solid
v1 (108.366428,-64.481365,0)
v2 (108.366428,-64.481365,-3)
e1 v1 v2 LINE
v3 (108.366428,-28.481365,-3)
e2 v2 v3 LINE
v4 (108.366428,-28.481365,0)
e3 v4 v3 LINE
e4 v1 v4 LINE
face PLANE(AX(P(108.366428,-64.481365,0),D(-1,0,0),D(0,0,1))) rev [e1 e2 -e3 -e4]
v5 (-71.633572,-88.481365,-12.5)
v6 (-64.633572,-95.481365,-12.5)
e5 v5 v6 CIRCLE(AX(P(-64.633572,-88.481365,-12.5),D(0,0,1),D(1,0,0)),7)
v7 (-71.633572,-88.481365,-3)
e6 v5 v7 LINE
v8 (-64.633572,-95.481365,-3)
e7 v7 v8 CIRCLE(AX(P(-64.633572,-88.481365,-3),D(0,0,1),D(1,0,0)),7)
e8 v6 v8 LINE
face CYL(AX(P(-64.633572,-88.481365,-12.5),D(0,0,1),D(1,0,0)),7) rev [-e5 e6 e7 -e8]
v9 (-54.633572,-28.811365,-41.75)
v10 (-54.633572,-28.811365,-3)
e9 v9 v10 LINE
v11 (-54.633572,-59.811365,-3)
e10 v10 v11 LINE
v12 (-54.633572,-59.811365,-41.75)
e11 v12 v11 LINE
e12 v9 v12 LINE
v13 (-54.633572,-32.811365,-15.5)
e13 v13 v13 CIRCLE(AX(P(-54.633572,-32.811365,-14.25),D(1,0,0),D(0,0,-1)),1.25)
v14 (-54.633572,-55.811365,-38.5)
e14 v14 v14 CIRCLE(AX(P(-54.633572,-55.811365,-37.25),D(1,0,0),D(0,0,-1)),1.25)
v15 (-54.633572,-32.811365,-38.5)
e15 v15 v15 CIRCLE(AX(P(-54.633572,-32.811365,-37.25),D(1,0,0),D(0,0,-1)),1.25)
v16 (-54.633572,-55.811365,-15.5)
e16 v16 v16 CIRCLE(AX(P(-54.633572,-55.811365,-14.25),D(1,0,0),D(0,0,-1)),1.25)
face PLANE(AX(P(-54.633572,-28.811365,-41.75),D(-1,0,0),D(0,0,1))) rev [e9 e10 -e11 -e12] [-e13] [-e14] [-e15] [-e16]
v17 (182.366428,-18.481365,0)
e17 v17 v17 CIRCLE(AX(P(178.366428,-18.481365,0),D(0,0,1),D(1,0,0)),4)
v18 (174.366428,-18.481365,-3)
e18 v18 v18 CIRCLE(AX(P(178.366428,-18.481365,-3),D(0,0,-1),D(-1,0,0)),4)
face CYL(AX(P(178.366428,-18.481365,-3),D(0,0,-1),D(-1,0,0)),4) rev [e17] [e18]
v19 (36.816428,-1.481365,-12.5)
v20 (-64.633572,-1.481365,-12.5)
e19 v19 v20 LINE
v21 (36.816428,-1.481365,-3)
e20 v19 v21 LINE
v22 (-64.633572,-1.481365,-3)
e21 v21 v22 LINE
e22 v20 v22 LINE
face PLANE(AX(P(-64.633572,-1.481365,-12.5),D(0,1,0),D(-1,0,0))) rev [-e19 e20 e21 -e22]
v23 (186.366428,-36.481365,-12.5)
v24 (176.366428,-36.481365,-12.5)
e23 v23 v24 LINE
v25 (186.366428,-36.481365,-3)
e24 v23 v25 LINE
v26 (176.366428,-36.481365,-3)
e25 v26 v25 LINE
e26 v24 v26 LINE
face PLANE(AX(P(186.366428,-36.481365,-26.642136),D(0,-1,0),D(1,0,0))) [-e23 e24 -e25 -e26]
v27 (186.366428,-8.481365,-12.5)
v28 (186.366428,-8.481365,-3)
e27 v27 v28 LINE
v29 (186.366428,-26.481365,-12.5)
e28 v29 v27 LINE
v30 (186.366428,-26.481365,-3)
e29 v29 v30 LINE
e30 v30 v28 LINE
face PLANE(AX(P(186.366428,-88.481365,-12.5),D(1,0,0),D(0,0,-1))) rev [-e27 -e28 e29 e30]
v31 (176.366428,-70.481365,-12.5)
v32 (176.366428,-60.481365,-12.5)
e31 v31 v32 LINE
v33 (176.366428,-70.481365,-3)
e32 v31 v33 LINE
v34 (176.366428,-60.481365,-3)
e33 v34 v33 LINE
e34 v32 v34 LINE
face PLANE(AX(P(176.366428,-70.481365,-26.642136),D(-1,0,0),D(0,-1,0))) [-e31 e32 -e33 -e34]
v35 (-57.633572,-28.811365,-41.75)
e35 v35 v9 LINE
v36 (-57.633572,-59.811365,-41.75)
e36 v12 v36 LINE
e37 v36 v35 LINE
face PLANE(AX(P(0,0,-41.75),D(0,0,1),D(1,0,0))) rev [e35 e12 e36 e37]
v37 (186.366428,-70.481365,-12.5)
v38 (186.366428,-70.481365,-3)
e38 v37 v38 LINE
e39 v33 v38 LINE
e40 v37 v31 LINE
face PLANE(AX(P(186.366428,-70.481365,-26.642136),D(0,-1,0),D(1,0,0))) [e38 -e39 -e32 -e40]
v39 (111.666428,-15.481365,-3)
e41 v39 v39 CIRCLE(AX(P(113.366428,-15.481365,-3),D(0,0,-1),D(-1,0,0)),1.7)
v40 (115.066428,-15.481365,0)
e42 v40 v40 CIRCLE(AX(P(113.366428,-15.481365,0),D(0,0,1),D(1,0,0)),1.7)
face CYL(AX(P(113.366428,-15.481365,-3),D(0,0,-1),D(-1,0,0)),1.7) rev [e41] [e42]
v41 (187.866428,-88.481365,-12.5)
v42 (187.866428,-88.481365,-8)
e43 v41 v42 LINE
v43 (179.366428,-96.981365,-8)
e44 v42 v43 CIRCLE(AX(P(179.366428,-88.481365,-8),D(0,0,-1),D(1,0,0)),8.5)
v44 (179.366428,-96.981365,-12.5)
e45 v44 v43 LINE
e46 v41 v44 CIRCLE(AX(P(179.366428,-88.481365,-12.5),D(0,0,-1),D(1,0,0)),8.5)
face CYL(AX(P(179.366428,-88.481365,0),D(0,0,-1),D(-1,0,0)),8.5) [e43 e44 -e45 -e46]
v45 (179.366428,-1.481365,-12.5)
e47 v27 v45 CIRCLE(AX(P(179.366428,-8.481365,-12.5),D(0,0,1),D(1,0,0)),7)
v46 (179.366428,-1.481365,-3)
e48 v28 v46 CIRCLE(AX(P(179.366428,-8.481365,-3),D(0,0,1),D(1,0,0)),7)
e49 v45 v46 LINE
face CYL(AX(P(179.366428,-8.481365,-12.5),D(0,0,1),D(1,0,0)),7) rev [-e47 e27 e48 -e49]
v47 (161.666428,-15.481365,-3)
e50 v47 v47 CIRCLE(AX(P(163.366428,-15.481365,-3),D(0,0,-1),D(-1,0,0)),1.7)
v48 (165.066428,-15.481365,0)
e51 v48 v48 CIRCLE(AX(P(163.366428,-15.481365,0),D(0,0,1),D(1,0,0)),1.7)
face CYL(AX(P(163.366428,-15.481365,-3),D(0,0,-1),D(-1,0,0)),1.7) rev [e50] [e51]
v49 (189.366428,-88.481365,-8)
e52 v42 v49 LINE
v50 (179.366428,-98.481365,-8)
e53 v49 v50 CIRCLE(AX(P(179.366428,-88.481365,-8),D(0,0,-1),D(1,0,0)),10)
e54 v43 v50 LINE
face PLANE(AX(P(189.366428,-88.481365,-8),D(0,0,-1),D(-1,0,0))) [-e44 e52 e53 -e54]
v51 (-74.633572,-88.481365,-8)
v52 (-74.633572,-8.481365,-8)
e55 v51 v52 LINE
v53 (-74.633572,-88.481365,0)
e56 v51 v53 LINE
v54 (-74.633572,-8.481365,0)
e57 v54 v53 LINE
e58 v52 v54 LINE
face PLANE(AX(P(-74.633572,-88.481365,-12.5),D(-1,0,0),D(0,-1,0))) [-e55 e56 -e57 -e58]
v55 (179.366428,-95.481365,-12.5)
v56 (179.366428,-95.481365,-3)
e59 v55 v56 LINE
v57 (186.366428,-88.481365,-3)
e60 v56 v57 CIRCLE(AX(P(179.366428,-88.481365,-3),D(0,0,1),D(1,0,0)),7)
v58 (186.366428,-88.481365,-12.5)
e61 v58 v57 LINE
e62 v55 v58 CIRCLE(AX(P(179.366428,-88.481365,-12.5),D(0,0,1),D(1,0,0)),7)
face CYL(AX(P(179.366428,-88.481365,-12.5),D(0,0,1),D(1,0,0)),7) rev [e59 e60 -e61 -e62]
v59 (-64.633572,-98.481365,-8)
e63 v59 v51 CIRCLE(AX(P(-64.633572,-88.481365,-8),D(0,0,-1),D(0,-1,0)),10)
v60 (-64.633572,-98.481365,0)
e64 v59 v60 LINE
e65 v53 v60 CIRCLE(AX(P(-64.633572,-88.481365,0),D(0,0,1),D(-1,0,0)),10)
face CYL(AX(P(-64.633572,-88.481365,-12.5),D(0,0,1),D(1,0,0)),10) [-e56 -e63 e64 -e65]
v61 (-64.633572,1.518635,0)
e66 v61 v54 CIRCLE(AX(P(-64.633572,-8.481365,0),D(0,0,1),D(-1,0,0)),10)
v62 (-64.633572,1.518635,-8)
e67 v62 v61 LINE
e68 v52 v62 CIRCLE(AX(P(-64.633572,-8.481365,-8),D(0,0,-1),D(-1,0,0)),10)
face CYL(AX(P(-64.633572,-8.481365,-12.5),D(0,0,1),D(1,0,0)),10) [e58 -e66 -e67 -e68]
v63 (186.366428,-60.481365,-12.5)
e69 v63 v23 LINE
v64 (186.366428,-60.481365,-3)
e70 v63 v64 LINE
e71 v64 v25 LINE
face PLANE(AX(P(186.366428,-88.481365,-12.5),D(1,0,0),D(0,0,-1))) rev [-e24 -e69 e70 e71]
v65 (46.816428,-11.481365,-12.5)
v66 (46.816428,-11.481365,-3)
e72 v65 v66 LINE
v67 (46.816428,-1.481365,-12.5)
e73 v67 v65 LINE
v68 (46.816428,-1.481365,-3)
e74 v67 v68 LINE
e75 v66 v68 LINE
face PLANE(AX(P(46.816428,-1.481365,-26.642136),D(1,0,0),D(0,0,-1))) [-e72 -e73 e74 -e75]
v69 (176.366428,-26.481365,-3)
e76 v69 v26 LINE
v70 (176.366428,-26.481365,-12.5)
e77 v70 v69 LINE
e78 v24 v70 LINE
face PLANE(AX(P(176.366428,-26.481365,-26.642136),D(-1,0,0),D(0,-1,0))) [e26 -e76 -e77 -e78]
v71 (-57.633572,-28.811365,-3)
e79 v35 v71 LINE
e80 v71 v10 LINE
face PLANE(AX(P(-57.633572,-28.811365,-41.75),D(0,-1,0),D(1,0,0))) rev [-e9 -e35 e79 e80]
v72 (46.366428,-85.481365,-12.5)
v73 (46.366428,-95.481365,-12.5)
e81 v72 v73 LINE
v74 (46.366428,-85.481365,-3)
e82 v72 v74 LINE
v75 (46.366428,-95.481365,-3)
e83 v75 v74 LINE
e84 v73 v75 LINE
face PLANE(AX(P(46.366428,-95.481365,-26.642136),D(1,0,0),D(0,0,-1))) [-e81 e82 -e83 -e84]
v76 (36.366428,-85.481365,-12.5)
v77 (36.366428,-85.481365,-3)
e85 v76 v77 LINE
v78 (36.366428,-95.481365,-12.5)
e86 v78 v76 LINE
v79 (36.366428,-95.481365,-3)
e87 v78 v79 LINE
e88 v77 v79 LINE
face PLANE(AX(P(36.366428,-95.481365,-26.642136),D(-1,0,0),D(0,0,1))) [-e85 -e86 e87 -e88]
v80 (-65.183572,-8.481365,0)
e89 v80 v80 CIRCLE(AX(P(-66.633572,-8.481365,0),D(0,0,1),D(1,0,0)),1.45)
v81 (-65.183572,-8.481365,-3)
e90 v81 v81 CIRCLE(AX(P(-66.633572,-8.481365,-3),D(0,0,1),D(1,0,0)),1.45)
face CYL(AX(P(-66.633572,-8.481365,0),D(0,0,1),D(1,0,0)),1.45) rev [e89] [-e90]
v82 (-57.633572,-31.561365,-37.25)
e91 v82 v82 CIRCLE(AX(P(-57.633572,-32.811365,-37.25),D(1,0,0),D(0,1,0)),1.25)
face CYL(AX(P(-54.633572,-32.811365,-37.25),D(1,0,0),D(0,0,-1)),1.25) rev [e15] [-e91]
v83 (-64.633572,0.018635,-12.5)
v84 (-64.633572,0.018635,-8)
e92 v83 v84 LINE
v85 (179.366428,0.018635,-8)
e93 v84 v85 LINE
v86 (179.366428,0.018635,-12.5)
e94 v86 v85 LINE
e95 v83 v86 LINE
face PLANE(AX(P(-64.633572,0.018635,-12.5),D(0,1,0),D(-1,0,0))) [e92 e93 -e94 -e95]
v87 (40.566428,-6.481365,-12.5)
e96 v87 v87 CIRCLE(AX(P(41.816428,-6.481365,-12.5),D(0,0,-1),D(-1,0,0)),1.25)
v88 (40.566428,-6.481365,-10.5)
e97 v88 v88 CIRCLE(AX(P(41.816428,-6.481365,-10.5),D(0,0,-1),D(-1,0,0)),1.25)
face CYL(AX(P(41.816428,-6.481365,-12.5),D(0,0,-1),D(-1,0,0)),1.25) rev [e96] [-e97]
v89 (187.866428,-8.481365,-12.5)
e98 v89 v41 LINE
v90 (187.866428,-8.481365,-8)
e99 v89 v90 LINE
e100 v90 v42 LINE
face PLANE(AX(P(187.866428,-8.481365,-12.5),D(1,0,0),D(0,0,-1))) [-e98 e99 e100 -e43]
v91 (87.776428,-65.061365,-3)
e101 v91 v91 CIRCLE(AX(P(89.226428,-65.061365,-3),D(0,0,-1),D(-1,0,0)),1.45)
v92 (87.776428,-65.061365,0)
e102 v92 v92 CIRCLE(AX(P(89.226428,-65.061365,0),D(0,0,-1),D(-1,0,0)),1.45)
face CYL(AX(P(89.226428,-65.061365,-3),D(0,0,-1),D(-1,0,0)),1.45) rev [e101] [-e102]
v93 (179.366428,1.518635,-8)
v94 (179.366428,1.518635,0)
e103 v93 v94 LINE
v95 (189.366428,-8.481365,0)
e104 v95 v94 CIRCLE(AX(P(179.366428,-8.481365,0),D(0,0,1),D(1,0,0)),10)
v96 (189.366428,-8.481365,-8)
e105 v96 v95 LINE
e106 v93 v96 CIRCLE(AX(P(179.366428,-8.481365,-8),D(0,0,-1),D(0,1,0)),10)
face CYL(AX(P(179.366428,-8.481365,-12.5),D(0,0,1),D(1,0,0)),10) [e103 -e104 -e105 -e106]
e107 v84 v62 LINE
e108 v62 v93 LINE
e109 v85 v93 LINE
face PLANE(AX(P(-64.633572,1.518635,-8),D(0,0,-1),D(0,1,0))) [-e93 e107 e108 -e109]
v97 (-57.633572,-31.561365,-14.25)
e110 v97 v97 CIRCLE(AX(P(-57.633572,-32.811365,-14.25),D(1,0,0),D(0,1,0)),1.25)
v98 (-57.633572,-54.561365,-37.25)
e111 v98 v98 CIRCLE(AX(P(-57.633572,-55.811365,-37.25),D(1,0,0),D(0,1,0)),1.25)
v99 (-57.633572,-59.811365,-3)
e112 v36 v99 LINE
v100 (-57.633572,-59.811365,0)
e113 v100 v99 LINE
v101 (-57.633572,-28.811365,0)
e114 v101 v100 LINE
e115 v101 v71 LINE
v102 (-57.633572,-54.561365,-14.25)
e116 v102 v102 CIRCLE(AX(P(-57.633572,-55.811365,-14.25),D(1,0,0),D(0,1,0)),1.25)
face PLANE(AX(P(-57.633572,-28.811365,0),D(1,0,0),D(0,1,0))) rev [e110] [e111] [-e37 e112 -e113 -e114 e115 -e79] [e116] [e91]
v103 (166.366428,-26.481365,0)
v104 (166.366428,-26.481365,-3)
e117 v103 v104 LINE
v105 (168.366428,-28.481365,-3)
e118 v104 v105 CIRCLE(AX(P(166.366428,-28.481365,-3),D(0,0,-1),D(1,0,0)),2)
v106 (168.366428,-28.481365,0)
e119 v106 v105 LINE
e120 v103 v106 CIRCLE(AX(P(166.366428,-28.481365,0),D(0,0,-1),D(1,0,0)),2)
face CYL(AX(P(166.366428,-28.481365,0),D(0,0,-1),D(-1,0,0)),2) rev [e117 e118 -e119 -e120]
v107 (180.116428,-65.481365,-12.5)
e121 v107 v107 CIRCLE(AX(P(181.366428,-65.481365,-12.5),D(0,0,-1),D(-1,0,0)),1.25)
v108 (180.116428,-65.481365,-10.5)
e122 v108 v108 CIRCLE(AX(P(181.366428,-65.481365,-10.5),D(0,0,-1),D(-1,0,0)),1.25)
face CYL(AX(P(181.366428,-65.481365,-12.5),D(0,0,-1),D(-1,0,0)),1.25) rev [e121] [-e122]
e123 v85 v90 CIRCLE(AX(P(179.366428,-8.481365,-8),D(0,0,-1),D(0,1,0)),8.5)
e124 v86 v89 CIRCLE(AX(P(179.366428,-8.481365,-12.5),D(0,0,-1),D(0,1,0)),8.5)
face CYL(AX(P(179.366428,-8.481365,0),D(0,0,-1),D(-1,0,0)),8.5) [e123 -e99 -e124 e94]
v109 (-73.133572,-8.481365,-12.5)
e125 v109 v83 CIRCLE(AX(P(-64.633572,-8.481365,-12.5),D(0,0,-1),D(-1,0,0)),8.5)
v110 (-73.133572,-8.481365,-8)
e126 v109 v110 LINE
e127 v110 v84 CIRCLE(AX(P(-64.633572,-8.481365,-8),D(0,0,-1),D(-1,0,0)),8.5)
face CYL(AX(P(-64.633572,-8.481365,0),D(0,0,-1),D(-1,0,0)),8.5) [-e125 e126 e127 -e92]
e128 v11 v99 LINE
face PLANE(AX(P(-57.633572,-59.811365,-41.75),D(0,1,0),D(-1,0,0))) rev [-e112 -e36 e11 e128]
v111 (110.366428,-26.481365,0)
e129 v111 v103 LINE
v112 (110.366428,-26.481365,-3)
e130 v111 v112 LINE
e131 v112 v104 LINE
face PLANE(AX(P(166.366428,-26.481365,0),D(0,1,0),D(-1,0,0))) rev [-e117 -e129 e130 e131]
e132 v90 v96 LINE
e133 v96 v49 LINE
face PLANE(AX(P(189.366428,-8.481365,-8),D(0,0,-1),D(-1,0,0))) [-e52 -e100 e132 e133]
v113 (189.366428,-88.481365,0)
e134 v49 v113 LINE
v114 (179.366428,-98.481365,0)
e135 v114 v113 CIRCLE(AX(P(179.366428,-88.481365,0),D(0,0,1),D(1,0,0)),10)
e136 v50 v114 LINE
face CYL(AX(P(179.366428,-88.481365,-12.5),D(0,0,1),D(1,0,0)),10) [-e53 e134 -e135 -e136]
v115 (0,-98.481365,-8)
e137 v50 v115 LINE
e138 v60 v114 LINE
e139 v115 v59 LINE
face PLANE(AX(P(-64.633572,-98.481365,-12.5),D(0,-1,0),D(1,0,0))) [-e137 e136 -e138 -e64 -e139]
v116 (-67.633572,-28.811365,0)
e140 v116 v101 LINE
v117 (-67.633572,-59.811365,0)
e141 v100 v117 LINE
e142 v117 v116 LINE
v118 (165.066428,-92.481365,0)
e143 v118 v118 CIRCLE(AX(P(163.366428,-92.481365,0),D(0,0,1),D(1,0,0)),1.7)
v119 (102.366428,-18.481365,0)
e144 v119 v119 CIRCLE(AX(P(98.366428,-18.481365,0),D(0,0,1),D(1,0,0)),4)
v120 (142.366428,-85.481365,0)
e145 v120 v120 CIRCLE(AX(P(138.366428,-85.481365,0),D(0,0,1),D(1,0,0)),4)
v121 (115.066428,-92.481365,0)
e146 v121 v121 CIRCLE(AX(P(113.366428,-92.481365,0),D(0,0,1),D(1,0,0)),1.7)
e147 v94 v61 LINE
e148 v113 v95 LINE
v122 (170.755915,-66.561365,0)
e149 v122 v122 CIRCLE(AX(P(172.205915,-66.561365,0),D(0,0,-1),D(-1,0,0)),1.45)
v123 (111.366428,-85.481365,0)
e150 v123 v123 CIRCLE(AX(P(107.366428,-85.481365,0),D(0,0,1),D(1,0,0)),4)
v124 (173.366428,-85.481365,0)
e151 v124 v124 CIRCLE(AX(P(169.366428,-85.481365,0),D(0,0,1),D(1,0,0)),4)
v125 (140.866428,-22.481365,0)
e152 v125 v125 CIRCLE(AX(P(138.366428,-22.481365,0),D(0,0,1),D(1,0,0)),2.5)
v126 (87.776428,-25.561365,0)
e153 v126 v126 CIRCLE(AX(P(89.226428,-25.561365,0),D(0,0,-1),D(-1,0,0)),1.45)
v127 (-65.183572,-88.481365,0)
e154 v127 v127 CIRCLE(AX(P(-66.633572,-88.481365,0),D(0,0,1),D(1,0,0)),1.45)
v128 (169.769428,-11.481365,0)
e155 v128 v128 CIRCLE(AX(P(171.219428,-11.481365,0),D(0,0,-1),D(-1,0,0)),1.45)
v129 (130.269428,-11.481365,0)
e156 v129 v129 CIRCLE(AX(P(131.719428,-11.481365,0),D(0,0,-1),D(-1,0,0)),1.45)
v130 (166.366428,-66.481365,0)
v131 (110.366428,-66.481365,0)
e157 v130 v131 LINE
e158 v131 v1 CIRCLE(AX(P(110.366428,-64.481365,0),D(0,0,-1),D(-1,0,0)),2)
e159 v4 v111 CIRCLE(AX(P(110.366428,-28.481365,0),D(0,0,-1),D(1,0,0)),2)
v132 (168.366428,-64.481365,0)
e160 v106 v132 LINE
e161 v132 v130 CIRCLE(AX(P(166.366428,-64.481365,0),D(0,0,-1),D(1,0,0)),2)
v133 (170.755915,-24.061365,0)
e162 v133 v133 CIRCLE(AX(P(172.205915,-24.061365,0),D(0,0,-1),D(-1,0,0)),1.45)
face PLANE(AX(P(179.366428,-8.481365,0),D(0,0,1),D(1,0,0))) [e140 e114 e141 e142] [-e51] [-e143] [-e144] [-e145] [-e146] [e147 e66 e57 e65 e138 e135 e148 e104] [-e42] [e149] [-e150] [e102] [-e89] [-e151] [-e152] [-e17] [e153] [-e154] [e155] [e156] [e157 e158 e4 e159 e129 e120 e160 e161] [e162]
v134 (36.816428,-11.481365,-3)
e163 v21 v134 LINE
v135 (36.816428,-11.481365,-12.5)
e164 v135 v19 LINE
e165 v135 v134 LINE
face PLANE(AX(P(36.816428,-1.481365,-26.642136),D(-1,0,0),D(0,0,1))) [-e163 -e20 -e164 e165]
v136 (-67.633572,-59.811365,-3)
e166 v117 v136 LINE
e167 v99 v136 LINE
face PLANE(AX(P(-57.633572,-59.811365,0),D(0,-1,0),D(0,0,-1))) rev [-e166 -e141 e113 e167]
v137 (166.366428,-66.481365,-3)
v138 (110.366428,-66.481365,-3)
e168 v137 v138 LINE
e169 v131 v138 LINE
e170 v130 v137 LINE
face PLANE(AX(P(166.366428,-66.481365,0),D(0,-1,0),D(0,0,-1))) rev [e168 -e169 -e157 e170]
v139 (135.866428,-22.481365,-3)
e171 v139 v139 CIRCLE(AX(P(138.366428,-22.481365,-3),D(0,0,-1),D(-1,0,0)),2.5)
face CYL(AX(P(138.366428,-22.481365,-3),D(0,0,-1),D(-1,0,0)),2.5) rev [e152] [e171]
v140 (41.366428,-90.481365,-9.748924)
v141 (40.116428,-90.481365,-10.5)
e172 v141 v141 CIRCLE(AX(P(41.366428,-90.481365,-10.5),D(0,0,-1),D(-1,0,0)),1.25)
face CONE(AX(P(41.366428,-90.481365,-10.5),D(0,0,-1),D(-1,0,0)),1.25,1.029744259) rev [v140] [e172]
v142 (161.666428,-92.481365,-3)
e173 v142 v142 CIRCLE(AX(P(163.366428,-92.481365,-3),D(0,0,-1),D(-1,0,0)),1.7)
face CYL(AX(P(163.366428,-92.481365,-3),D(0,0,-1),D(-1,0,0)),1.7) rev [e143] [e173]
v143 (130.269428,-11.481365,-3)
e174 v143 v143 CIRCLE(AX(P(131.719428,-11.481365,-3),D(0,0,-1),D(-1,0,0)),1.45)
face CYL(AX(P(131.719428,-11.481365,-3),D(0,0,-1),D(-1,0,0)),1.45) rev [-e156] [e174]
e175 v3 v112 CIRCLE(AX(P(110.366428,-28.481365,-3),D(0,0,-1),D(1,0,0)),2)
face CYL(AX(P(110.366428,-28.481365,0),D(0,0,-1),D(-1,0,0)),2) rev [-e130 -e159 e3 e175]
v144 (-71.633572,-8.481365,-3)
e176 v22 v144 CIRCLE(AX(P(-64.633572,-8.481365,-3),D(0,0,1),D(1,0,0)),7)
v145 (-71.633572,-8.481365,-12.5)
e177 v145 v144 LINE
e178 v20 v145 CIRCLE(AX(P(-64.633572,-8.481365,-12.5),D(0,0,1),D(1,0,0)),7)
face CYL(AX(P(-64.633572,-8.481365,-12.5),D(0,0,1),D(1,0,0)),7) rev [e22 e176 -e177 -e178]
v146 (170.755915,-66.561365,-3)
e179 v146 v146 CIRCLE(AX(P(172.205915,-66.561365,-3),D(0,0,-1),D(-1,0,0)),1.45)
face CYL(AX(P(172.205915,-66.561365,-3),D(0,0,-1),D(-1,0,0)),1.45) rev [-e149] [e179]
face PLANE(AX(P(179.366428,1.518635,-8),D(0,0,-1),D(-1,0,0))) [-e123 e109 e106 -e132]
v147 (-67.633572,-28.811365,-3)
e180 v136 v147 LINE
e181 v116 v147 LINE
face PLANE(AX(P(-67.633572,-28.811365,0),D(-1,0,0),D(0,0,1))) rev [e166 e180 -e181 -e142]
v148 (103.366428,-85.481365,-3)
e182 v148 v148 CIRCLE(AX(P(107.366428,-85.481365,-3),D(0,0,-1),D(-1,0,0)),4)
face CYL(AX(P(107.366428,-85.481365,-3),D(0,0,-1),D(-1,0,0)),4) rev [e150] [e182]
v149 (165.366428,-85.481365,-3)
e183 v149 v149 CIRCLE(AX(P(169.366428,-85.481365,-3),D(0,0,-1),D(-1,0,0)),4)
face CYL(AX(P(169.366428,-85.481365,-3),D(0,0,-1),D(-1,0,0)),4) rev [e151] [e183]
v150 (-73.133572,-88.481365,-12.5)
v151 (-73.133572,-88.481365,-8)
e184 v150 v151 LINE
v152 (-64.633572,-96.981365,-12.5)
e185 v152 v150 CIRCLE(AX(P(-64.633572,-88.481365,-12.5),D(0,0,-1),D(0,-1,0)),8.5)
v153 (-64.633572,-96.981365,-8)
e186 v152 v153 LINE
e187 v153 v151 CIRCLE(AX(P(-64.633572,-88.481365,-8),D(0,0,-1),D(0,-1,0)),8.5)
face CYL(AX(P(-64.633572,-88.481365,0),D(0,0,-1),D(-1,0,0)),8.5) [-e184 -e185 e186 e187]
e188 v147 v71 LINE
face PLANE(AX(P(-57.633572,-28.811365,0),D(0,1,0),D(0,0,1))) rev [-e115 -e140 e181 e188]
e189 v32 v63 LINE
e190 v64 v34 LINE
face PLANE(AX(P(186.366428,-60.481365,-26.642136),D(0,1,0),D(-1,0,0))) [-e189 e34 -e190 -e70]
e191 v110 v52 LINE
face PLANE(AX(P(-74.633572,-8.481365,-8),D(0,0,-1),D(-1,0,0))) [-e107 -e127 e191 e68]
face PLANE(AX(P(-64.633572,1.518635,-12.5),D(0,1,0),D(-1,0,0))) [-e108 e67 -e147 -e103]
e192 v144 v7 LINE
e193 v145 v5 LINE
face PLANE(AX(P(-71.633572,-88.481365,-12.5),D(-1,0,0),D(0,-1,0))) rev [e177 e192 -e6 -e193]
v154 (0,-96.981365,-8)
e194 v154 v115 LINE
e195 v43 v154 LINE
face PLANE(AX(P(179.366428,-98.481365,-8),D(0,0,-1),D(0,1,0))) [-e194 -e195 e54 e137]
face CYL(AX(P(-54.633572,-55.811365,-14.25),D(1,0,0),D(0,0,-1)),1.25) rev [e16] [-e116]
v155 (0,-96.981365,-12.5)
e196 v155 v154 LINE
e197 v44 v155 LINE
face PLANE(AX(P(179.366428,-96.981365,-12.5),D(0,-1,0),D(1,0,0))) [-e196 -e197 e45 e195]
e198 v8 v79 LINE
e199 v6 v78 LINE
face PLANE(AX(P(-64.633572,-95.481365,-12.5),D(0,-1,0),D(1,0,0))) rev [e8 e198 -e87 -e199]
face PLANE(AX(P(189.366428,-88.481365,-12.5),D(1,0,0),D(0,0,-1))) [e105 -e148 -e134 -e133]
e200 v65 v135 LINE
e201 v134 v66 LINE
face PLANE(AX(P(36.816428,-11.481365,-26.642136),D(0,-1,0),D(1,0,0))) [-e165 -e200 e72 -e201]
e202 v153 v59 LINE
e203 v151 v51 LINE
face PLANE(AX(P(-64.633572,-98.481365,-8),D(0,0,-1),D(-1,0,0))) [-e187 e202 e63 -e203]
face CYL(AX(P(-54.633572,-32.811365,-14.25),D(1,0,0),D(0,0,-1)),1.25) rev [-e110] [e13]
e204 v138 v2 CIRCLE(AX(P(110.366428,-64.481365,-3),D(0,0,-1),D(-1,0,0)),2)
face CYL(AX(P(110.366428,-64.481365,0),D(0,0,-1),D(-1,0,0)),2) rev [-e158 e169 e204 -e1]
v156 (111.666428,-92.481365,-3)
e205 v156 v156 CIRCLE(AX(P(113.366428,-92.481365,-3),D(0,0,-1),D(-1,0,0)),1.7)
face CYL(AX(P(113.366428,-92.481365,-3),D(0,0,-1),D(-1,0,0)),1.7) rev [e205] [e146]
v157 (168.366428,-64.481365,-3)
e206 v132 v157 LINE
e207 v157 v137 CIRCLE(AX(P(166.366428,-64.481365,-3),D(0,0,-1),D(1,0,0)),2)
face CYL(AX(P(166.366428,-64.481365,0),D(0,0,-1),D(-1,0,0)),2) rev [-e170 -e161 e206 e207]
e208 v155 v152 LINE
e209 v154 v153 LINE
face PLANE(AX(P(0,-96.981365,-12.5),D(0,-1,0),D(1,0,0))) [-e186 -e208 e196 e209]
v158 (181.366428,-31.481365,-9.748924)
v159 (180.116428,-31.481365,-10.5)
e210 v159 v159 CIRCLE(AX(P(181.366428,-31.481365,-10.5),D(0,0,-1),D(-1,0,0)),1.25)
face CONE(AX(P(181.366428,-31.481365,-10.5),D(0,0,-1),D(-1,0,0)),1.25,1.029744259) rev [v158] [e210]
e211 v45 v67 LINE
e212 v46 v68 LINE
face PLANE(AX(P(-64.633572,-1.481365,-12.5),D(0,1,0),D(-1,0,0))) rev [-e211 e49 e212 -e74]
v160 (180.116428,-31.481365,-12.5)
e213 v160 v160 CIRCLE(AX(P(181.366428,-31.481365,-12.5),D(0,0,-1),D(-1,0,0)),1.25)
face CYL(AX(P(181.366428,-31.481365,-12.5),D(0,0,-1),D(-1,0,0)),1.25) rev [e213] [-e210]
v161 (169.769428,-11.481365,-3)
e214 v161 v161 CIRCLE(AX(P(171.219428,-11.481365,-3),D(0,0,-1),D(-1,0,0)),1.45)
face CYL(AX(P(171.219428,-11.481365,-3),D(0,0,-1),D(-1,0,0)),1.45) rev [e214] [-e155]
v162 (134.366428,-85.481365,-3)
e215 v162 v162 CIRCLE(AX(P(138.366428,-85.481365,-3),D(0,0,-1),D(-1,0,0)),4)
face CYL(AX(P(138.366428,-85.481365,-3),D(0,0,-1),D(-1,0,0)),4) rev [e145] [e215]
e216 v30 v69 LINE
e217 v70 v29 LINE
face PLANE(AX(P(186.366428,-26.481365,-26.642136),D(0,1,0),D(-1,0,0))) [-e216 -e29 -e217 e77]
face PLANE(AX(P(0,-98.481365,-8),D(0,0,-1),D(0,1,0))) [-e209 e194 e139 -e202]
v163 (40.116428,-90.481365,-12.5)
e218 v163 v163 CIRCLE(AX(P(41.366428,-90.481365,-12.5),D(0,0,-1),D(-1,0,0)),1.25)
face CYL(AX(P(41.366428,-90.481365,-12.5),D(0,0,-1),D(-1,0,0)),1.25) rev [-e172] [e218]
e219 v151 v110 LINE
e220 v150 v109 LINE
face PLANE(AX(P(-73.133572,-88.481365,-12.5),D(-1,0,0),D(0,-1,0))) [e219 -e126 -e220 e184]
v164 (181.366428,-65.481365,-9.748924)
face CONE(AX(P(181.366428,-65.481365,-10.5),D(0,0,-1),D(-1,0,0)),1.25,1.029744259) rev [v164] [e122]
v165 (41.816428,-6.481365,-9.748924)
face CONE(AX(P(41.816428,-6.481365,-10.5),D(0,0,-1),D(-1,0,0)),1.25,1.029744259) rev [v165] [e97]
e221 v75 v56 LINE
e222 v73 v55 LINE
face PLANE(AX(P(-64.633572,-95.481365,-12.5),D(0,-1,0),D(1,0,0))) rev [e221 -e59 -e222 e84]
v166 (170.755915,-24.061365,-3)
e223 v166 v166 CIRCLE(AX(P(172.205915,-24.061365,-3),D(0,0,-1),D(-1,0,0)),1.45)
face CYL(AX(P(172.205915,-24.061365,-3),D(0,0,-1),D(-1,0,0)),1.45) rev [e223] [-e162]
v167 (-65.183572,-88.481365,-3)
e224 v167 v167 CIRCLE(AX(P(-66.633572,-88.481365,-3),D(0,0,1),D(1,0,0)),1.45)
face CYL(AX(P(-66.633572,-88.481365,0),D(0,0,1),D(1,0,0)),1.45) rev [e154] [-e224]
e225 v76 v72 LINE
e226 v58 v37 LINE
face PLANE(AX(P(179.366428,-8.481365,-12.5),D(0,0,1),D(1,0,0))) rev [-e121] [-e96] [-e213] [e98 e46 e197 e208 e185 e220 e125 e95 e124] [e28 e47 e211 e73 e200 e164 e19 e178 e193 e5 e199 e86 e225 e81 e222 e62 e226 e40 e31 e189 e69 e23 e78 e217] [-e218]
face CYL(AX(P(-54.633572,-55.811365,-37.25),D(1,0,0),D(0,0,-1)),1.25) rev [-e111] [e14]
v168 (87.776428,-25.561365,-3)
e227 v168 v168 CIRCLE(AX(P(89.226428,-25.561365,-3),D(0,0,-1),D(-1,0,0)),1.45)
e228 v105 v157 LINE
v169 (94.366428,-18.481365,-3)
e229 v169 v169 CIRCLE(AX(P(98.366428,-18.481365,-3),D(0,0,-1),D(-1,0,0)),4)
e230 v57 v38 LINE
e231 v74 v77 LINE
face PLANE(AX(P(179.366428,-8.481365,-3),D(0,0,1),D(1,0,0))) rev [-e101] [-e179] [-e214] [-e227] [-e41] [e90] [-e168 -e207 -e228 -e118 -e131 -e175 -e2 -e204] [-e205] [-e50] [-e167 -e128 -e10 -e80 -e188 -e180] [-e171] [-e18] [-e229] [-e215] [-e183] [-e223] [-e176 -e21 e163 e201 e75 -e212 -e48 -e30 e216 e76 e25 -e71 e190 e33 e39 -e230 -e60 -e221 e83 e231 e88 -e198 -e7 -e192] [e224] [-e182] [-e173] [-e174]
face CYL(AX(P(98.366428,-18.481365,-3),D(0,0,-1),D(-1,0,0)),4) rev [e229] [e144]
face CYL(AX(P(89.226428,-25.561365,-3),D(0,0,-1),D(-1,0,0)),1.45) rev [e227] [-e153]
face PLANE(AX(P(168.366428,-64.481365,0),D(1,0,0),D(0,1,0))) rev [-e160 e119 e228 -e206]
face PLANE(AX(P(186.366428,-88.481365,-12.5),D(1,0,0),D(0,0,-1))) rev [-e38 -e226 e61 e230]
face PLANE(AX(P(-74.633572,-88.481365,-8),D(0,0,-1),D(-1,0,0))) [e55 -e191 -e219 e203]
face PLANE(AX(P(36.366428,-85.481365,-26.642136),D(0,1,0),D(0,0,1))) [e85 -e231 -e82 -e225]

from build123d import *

# Parameters (mm, degrees)
BOX_EXTRUDE_DEPTH                = 12.5
SHELL1_T                         = -3
CUT_SWEEP_START                  = -12.5
CUT_SWEEP_DEPTH                  = 4.5
SKETCH2_W                        = 10
SKETCH2_H                        = 10
SQUARES_EXTRUDE_DEPTH            = 9.5
SKETCH11_W                       = 10
SKETCH11_H                       = 31
SKETCH11_W_2                     = 45
SKETCH11_H_2                     = 10
CUT_EXTRUDE2_DEPTH               = 214.65503369
SQUARES_M3_CLEARANCE_HOLES_D     = 2.5
SQUARES_M3_CLEARANCE_HOLES_DEPTH = 2
SQUARES_M3_CLEARANCE_HOLES_TIP   = 0.751075774
F_8_0MM_DOWEL_HOLE1_D            = 8
F_8_0MM_DOWEL_HOLE1_DEPTH        = 7.5
F_8_0MM_DOWEL_HOLE1_TIP          = 2.403442476
F_5_0MM_DOWEL_HOLE1_D            = 5
F_5_0MM_DOWEL_HOLE1_DEPTH        = 7.5
F_5_0MM_DOWEL_HOLE1_TIP          = 1.502151548
M3_CLEARANCE_HOLE3_D             = 3.4
M3_CLEARANCE_HOLE3_DEPTH         = 7.5
M3_CLEARANCE_HOLE3_TIP           = 1.021463052
M3_5X0_6_TAPPED_HOLE1_D          = 2.9
M3_5X0_6_TAPPED_HOLE2_D          = 2.9
M3_5X0_6_TAPPED_HOLE2_DEPTH      = 8.8
M3_5X0_6_TAPPED_HOLE2_TIP        = 0.871247898
SKETCH25_W                       = 3
SKETCH25_H                       = 31
BOSS_EXTRUDE1_DEPTH              = 38.75
F_2_5MM_DOWEL_HOLE1_D            = 2.5
F_2_5MM_DOWEL_HOLE1_DEPTH        = 10
F_2_5MM_DOWEL_HOLE1_TIP          = 0.751075774


# Read off the part's stored shape, not the designer's step: Cut-Sweep
with BuildPart() as part:
    # Sketch1 → Box-Extrude (new body)
    with BuildSketch(Plane.XY):
        with BuildLine():
            Line((-64.633571826, -98.481365252), (179.366428174, -98.481365252))
            ThreePointArc((179.366428174, -98.481365252), (186.437495986, -95.552433064), (189.366428174, -88.481365252))
            Line((189.366428174, -88.481365252), (189.366428174, -8.481365252))
            ThreePointArc((189.366428174, -8.481365252), (186.437495986, -1.41029744), (179.366428174, 1.518634748))
            Line((179.366428174, 1.518634748), (-64.633571826, 1.518634748))
            ThreePointArc((-64.633571826, 1.518634748), (-71.704639638, -1.41029744), (-74.633571826, -8.481365252))
            Line((-74.633571826, -8.481365252), (-74.633571826, -88.481365252))
            ThreePointArc((-74.633571826, -88.481365252), (-71.704639638, -95.552433064), (-64.633571826, -98.481365252))
        make_face()
    extrude(amount=-BOX_EXTRUDE_DEPTH)

    # Shell1
    shell1_openings = [part.faces().sort_by_distance(p)[0] for p in [
        (57.366428174, -48.481365252, -12.5),
    ]]
    offset(amount=SHELL1_T, openings=shell1_openings, kind=Kind.INTERSECTION)

    # Cut-Sweep outline → Cut-Sweep (cut)
    with BuildSketch(Plane.XY.offset(CUT_SWEEP_START)):
        with BuildLine():
            Line((189.366428174, -88.481365252), (189.366428174, -8.481365252))
            ThreePointArc((189.366428174, -8.481365252), (186.437495986, -1.41029744), (179.366428174, 1.518634748))
            Line((179.366428174, 1.518634748), (-64.633571826, 1.518634748))
            ThreePointArc((-64.633571826, 1.518634748), (-71.704639638, -1.41029744), (-74.633571826, -8.481365252))
            Line((-74.633571826, -8.481365252), (-74.633571826, -88.481365252))
            ThreePointArc((-74.633571826, -88.481365252), (-71.704639638, -95.552433064), (-64.633571826, -98.481365252))
            Line((-64.633571826, -98.481365252), (179.366428174, -98.481365252))
            ThreePointArc((179.366428174, -98.481365252), (186.437495986, -95.552433064), (189.366428174, -88.481365252))
        make_face()
        with BuildLine():
            Line((179.366428174, -96.981365252), (-64.633571826, -96.981365252))
            ThreePointArc((-64.633571826, -96.981365252), (-70.643979466, -94.491772892), (-73.133571826, -88.481365252))
            Line((-73.133571826, -88.481365252), (-73.133571826, -8.481365252))
            ThreePointArc((-73.133571826, -8.481365252), (-70.643979466, -2.470957612), (-64.633571826, 0.018634748))
            Line((-64.633571826, 0.018634748), (179.366428174, 0.018634748))
            ThreePointArc((179.366428174, 0.018634748), (185.376835814, -2.470957612), (187.866428174, -8.481365252))
            Line((187.866428174, -8.481365252), (187.866428174, -88.481365252))
            ThreePointArc((187.866428174, -88.481365252), (185.376835814, -94.491772892), (179.366428174, -96.981365252))
        make_face(mode=Mode.SUBTRACT)
    extrude(amount=CUT_SWEEP_DEPTH, mode=Mode.SUBTRACT)

    # Sketch2 → Squares-Extrude (add)
    with BuildSketch(Plane.XY.offset(-3)):
        with Locations((41.816428174, -6.481365252)):
            Rectangle(SKETCH2_W, SKETCH2_H)
        with Locations((181.366428174, -65.481365252)):
            Rectangle(SKETCH2_W, SKETCH2_H)
        with Locations((41.366428174, -90.481365252)):
            Rectangle(SKETCH2_W, SKETCH2_H)
        with Locations((181.366428174, -31.481365252)):
            Rectangle(SKETCH2_W, SKETCH2_H)
    extrude(amount=-SQUARES_EXTRUDE_DEPTH)

    # Sketch11 → Cut-Extrude2 (cut, through all)
    with BuildSketch(Plane(origin=(0, 0, -3), x_dir=(-1, 0, 0), z_dir=(0, 0, -1))):
        with BuildLine():
            Line((-166.366428174, -66.481365252), (-110.366428174, -66.481365252))
            ThreePointArc((-110.366428174, -66.481365252), (-108.952214612, -65.895578814), (-108.366428174, -64.481365252))
            Line((-108.366428174, -64.481365252), (-108.366428174, -28.481365252))
            ThreePointArc((-108.366428174, -28.481365252), (-108.952214612, -27.067151689), (-110.366428174, -26.481365252))
            Line((-110.366428174, -26.481365252), (-166.366428174, -26.481365252))
            ThreePointArc((-166.366428174, -26.481365252), (-167.780641736, -27.067151689), (-168.366428174, -28.481365252))
            Line((-168.366428174, -28.481365252), (-168.366428174, -64.481365252))
            ThreePointArc((-168.366428174, -64.481365252), (-167.780641736, -65.895578814), (-166.366428174, -66.481365252))
        make_face()
        with Locations((62.633571826, -44.311365252)):
            Rectangle(SKETCH11_W, SKETCH11_H)
        with Locations((-152.769428174, 113.518634748)):
            Rectangle(SKETCH11_W_2, SKETCH11_H_2)
    extrude(amount=-CUT_EXTRUDE2_DEPTH, mode=Mode.SUBTRACT)

    # Squares M3 Clearance Holes
    with Locations(Plane(origin=(0, 0, -12.5), x_dir=(1, 0, 0), z_dir=(0, 0, -1))):
        with Locations((41.816428174, 6.481365252), (181.366428174, 31.481365252), (181.366428174, 65.481365252), (41.366428174, 90.481365252)):
            Hole(SQUARES_M3_CLEARANCE_HOLES_D / 2, depth=SQUARES_M3_CLEARANCE_HOLES_DEPTH)
            with Locations((0, 0, -(SQUARES_M3_CLEARANCE_HOLES_DEPTH + SQUARES_M3_CLEARANCE_HOLES_TIP / 2))):  # 118° drill point
                Cone(0, SQUARES_M3_CLEARANCE_HOLES_D / 2, SQUARES_M3_CLEARANCE_HOLES_TIP, mode=Mode.SUBTRACT)

    # Ø8.0mm Dowel Hole1
    with Locations(Plane(origin=(169.366428174, -85.481365252, -3), x_dir=(-1, 0, 0), z_dir=(0, 0, -1))):
        with Locations((0, 0), (31, 0), (62, 0), (71, 67), (-9, 67)):
            Hole(F_8_0MM_DOWEL_HOLE1_D / 2, depth=F_8_0MM_DOWEL_HOLE1_DEPTH)
            with Locations((0, 0, -(F_8_0MM_DOWEL_HOLE1_DEPTH + F_8_0MM_DOWEL_HOLE1_TIP / 2))):  # 118° drill point
                Cone(0, F_8_0MM_DOWEL_HOLE1_D / 2, F_8_0MM_DOWEL_HOLE1_TIP, mode=Mode.SUBTRACT)

    # Ø5.0mm Dowel Hole1
    with Locations(Plane(origin=(0, 0, -3), x_dir=(-1, 0, 0), z_dir=(0, 0, -1))):
        with Locations((-138.366428174, -22.481365252)):
            Hole(F_5_0MM_DOWEL_HOLE1_D / 2, depth=F_5_0MM_DOWEL_HOLE1_DEPTH)
            with Locations((0, 0, -(F_5_0MM_DOWEL_HOLE1_DEPTH + F_5_0MM_DOWEL_HOLE1_TIP / 2))):  # 118° drill point
                Cone(0, F_5_0MM_DOWEL_HOLE1_D / 2, F_5_0MM_DOWEL_HOLE1_TIP, mode=Mode.SUBTRACT)

    # M3 Clearance Hole3
    with Locations(Plane(origin=(0, 0, -3), x_dir=(-1, 0, 0), z_dir=(0, 0, -1))):
        with Locations((-163.366428174, -15.481365252), (-113.366428174, -15.481365252), (-163.366428174, -92.481365252), (-113.366428174, -92.481365252)):
            Hole(M3_CLEARANCE_HOLE3_D / 2, depth=M3_CLEARANCE_HOLE3_DEPTH)
            with Locations((0, 0, -(M3_CLEARANCE_HOLE3_DEPTH + M3_CLEARANCE_HOLE3_TIP / 2))):  # 118° drill point
                Cone(0, M3_CLEARANCE_HOLE3_D / 2, M3_CLEARANCE_HOLE3_TIP, mode=Mode.SUBTRACT)

    # M3.5x0.6 Tapped Hole1 (through all)
    with Locations(Plane(origin=(0, 0, -3), x_dir=(-1, 0, 0), z_dir=(0, 0, -1))):
        with Locations((-172.205915164, -24.061365252), (-172.205915164, -66.561365252), (-89.226428174, -25.561365252), (-89.226428174, -65.061365252), (-171.219428174, -11.481365252), (-131.719428174, -11.481365252)):
            Hole(M3_5X0_6_TAPPED_HOLE1_D / 2)

    # M3.5x0.6 Tapped Hole2
    with Locations(Plane.XY):
        with Locations((-66.633571826, -8.481365252), (-66.633571826, -88.481365252)):
            Hole(M3_5X0_6_TAPPED_HOLE2_D / 2, depth=M3_5X0_6_TAPPED_HOLE2_DEPTH)
            with Locations((0, 0, -(M3_5X0_6_TAPPED_HOLE2_DEPTH + M3_5X0_6_TAPPED_HOLE2_TIP / 2))):  # 118° drill point
                Cone(0, M3_5X0_6_TAPPED_HOLE2_D / 2, M3_5X0_6_TAPPED_HOLE2_TIP, mode=Mode.SUBTRACT)

    # Sketch25 → Boss-Extrude1 (add)
    with BuildSketch(Plane(origin=(0, 0, -3), x_dir=(-1, 0, 0), z_dir=(0, 0, -1))):
        with Locations((56.133571826, -44.311365252)):
            Rectangle(SKETCH25_W, SKETCH25_H)
    extrude(amount=BOSS_EXTRUDE1_DEPTH)

    # Ø2.5mm Dowel Hole1
    with Locations(Plane(origin=(-54.633571826, 0, 0), x_dir=(0, 0, -1), z_dir=(1, 0, 0))):
        with Locations((37.25, -32.811365252), (37.25, -55.811365252), (14.25, -32.811365252), (14.25, -55.811365252)):
            Hole(F_2_5MM_DOWEL_HOLE1_D / 2, depth=F_2_5MM_DOWEL_HOLE1_DEPTH)
            with Locations((0, 0, -(F_2_5MM_DOWEL_HOLE1_DEPTH + F_2_5MM_DOWEL_HOLE1_TIP / 2))):  # 118° drill point
                Cone(0, F_2_5MM_DOWEL_HOLE1_D / 2, F_2_5MM_DOWEL_HOLE1_TIP, mode=Mode.SUBTRACT)


solid = part.part
